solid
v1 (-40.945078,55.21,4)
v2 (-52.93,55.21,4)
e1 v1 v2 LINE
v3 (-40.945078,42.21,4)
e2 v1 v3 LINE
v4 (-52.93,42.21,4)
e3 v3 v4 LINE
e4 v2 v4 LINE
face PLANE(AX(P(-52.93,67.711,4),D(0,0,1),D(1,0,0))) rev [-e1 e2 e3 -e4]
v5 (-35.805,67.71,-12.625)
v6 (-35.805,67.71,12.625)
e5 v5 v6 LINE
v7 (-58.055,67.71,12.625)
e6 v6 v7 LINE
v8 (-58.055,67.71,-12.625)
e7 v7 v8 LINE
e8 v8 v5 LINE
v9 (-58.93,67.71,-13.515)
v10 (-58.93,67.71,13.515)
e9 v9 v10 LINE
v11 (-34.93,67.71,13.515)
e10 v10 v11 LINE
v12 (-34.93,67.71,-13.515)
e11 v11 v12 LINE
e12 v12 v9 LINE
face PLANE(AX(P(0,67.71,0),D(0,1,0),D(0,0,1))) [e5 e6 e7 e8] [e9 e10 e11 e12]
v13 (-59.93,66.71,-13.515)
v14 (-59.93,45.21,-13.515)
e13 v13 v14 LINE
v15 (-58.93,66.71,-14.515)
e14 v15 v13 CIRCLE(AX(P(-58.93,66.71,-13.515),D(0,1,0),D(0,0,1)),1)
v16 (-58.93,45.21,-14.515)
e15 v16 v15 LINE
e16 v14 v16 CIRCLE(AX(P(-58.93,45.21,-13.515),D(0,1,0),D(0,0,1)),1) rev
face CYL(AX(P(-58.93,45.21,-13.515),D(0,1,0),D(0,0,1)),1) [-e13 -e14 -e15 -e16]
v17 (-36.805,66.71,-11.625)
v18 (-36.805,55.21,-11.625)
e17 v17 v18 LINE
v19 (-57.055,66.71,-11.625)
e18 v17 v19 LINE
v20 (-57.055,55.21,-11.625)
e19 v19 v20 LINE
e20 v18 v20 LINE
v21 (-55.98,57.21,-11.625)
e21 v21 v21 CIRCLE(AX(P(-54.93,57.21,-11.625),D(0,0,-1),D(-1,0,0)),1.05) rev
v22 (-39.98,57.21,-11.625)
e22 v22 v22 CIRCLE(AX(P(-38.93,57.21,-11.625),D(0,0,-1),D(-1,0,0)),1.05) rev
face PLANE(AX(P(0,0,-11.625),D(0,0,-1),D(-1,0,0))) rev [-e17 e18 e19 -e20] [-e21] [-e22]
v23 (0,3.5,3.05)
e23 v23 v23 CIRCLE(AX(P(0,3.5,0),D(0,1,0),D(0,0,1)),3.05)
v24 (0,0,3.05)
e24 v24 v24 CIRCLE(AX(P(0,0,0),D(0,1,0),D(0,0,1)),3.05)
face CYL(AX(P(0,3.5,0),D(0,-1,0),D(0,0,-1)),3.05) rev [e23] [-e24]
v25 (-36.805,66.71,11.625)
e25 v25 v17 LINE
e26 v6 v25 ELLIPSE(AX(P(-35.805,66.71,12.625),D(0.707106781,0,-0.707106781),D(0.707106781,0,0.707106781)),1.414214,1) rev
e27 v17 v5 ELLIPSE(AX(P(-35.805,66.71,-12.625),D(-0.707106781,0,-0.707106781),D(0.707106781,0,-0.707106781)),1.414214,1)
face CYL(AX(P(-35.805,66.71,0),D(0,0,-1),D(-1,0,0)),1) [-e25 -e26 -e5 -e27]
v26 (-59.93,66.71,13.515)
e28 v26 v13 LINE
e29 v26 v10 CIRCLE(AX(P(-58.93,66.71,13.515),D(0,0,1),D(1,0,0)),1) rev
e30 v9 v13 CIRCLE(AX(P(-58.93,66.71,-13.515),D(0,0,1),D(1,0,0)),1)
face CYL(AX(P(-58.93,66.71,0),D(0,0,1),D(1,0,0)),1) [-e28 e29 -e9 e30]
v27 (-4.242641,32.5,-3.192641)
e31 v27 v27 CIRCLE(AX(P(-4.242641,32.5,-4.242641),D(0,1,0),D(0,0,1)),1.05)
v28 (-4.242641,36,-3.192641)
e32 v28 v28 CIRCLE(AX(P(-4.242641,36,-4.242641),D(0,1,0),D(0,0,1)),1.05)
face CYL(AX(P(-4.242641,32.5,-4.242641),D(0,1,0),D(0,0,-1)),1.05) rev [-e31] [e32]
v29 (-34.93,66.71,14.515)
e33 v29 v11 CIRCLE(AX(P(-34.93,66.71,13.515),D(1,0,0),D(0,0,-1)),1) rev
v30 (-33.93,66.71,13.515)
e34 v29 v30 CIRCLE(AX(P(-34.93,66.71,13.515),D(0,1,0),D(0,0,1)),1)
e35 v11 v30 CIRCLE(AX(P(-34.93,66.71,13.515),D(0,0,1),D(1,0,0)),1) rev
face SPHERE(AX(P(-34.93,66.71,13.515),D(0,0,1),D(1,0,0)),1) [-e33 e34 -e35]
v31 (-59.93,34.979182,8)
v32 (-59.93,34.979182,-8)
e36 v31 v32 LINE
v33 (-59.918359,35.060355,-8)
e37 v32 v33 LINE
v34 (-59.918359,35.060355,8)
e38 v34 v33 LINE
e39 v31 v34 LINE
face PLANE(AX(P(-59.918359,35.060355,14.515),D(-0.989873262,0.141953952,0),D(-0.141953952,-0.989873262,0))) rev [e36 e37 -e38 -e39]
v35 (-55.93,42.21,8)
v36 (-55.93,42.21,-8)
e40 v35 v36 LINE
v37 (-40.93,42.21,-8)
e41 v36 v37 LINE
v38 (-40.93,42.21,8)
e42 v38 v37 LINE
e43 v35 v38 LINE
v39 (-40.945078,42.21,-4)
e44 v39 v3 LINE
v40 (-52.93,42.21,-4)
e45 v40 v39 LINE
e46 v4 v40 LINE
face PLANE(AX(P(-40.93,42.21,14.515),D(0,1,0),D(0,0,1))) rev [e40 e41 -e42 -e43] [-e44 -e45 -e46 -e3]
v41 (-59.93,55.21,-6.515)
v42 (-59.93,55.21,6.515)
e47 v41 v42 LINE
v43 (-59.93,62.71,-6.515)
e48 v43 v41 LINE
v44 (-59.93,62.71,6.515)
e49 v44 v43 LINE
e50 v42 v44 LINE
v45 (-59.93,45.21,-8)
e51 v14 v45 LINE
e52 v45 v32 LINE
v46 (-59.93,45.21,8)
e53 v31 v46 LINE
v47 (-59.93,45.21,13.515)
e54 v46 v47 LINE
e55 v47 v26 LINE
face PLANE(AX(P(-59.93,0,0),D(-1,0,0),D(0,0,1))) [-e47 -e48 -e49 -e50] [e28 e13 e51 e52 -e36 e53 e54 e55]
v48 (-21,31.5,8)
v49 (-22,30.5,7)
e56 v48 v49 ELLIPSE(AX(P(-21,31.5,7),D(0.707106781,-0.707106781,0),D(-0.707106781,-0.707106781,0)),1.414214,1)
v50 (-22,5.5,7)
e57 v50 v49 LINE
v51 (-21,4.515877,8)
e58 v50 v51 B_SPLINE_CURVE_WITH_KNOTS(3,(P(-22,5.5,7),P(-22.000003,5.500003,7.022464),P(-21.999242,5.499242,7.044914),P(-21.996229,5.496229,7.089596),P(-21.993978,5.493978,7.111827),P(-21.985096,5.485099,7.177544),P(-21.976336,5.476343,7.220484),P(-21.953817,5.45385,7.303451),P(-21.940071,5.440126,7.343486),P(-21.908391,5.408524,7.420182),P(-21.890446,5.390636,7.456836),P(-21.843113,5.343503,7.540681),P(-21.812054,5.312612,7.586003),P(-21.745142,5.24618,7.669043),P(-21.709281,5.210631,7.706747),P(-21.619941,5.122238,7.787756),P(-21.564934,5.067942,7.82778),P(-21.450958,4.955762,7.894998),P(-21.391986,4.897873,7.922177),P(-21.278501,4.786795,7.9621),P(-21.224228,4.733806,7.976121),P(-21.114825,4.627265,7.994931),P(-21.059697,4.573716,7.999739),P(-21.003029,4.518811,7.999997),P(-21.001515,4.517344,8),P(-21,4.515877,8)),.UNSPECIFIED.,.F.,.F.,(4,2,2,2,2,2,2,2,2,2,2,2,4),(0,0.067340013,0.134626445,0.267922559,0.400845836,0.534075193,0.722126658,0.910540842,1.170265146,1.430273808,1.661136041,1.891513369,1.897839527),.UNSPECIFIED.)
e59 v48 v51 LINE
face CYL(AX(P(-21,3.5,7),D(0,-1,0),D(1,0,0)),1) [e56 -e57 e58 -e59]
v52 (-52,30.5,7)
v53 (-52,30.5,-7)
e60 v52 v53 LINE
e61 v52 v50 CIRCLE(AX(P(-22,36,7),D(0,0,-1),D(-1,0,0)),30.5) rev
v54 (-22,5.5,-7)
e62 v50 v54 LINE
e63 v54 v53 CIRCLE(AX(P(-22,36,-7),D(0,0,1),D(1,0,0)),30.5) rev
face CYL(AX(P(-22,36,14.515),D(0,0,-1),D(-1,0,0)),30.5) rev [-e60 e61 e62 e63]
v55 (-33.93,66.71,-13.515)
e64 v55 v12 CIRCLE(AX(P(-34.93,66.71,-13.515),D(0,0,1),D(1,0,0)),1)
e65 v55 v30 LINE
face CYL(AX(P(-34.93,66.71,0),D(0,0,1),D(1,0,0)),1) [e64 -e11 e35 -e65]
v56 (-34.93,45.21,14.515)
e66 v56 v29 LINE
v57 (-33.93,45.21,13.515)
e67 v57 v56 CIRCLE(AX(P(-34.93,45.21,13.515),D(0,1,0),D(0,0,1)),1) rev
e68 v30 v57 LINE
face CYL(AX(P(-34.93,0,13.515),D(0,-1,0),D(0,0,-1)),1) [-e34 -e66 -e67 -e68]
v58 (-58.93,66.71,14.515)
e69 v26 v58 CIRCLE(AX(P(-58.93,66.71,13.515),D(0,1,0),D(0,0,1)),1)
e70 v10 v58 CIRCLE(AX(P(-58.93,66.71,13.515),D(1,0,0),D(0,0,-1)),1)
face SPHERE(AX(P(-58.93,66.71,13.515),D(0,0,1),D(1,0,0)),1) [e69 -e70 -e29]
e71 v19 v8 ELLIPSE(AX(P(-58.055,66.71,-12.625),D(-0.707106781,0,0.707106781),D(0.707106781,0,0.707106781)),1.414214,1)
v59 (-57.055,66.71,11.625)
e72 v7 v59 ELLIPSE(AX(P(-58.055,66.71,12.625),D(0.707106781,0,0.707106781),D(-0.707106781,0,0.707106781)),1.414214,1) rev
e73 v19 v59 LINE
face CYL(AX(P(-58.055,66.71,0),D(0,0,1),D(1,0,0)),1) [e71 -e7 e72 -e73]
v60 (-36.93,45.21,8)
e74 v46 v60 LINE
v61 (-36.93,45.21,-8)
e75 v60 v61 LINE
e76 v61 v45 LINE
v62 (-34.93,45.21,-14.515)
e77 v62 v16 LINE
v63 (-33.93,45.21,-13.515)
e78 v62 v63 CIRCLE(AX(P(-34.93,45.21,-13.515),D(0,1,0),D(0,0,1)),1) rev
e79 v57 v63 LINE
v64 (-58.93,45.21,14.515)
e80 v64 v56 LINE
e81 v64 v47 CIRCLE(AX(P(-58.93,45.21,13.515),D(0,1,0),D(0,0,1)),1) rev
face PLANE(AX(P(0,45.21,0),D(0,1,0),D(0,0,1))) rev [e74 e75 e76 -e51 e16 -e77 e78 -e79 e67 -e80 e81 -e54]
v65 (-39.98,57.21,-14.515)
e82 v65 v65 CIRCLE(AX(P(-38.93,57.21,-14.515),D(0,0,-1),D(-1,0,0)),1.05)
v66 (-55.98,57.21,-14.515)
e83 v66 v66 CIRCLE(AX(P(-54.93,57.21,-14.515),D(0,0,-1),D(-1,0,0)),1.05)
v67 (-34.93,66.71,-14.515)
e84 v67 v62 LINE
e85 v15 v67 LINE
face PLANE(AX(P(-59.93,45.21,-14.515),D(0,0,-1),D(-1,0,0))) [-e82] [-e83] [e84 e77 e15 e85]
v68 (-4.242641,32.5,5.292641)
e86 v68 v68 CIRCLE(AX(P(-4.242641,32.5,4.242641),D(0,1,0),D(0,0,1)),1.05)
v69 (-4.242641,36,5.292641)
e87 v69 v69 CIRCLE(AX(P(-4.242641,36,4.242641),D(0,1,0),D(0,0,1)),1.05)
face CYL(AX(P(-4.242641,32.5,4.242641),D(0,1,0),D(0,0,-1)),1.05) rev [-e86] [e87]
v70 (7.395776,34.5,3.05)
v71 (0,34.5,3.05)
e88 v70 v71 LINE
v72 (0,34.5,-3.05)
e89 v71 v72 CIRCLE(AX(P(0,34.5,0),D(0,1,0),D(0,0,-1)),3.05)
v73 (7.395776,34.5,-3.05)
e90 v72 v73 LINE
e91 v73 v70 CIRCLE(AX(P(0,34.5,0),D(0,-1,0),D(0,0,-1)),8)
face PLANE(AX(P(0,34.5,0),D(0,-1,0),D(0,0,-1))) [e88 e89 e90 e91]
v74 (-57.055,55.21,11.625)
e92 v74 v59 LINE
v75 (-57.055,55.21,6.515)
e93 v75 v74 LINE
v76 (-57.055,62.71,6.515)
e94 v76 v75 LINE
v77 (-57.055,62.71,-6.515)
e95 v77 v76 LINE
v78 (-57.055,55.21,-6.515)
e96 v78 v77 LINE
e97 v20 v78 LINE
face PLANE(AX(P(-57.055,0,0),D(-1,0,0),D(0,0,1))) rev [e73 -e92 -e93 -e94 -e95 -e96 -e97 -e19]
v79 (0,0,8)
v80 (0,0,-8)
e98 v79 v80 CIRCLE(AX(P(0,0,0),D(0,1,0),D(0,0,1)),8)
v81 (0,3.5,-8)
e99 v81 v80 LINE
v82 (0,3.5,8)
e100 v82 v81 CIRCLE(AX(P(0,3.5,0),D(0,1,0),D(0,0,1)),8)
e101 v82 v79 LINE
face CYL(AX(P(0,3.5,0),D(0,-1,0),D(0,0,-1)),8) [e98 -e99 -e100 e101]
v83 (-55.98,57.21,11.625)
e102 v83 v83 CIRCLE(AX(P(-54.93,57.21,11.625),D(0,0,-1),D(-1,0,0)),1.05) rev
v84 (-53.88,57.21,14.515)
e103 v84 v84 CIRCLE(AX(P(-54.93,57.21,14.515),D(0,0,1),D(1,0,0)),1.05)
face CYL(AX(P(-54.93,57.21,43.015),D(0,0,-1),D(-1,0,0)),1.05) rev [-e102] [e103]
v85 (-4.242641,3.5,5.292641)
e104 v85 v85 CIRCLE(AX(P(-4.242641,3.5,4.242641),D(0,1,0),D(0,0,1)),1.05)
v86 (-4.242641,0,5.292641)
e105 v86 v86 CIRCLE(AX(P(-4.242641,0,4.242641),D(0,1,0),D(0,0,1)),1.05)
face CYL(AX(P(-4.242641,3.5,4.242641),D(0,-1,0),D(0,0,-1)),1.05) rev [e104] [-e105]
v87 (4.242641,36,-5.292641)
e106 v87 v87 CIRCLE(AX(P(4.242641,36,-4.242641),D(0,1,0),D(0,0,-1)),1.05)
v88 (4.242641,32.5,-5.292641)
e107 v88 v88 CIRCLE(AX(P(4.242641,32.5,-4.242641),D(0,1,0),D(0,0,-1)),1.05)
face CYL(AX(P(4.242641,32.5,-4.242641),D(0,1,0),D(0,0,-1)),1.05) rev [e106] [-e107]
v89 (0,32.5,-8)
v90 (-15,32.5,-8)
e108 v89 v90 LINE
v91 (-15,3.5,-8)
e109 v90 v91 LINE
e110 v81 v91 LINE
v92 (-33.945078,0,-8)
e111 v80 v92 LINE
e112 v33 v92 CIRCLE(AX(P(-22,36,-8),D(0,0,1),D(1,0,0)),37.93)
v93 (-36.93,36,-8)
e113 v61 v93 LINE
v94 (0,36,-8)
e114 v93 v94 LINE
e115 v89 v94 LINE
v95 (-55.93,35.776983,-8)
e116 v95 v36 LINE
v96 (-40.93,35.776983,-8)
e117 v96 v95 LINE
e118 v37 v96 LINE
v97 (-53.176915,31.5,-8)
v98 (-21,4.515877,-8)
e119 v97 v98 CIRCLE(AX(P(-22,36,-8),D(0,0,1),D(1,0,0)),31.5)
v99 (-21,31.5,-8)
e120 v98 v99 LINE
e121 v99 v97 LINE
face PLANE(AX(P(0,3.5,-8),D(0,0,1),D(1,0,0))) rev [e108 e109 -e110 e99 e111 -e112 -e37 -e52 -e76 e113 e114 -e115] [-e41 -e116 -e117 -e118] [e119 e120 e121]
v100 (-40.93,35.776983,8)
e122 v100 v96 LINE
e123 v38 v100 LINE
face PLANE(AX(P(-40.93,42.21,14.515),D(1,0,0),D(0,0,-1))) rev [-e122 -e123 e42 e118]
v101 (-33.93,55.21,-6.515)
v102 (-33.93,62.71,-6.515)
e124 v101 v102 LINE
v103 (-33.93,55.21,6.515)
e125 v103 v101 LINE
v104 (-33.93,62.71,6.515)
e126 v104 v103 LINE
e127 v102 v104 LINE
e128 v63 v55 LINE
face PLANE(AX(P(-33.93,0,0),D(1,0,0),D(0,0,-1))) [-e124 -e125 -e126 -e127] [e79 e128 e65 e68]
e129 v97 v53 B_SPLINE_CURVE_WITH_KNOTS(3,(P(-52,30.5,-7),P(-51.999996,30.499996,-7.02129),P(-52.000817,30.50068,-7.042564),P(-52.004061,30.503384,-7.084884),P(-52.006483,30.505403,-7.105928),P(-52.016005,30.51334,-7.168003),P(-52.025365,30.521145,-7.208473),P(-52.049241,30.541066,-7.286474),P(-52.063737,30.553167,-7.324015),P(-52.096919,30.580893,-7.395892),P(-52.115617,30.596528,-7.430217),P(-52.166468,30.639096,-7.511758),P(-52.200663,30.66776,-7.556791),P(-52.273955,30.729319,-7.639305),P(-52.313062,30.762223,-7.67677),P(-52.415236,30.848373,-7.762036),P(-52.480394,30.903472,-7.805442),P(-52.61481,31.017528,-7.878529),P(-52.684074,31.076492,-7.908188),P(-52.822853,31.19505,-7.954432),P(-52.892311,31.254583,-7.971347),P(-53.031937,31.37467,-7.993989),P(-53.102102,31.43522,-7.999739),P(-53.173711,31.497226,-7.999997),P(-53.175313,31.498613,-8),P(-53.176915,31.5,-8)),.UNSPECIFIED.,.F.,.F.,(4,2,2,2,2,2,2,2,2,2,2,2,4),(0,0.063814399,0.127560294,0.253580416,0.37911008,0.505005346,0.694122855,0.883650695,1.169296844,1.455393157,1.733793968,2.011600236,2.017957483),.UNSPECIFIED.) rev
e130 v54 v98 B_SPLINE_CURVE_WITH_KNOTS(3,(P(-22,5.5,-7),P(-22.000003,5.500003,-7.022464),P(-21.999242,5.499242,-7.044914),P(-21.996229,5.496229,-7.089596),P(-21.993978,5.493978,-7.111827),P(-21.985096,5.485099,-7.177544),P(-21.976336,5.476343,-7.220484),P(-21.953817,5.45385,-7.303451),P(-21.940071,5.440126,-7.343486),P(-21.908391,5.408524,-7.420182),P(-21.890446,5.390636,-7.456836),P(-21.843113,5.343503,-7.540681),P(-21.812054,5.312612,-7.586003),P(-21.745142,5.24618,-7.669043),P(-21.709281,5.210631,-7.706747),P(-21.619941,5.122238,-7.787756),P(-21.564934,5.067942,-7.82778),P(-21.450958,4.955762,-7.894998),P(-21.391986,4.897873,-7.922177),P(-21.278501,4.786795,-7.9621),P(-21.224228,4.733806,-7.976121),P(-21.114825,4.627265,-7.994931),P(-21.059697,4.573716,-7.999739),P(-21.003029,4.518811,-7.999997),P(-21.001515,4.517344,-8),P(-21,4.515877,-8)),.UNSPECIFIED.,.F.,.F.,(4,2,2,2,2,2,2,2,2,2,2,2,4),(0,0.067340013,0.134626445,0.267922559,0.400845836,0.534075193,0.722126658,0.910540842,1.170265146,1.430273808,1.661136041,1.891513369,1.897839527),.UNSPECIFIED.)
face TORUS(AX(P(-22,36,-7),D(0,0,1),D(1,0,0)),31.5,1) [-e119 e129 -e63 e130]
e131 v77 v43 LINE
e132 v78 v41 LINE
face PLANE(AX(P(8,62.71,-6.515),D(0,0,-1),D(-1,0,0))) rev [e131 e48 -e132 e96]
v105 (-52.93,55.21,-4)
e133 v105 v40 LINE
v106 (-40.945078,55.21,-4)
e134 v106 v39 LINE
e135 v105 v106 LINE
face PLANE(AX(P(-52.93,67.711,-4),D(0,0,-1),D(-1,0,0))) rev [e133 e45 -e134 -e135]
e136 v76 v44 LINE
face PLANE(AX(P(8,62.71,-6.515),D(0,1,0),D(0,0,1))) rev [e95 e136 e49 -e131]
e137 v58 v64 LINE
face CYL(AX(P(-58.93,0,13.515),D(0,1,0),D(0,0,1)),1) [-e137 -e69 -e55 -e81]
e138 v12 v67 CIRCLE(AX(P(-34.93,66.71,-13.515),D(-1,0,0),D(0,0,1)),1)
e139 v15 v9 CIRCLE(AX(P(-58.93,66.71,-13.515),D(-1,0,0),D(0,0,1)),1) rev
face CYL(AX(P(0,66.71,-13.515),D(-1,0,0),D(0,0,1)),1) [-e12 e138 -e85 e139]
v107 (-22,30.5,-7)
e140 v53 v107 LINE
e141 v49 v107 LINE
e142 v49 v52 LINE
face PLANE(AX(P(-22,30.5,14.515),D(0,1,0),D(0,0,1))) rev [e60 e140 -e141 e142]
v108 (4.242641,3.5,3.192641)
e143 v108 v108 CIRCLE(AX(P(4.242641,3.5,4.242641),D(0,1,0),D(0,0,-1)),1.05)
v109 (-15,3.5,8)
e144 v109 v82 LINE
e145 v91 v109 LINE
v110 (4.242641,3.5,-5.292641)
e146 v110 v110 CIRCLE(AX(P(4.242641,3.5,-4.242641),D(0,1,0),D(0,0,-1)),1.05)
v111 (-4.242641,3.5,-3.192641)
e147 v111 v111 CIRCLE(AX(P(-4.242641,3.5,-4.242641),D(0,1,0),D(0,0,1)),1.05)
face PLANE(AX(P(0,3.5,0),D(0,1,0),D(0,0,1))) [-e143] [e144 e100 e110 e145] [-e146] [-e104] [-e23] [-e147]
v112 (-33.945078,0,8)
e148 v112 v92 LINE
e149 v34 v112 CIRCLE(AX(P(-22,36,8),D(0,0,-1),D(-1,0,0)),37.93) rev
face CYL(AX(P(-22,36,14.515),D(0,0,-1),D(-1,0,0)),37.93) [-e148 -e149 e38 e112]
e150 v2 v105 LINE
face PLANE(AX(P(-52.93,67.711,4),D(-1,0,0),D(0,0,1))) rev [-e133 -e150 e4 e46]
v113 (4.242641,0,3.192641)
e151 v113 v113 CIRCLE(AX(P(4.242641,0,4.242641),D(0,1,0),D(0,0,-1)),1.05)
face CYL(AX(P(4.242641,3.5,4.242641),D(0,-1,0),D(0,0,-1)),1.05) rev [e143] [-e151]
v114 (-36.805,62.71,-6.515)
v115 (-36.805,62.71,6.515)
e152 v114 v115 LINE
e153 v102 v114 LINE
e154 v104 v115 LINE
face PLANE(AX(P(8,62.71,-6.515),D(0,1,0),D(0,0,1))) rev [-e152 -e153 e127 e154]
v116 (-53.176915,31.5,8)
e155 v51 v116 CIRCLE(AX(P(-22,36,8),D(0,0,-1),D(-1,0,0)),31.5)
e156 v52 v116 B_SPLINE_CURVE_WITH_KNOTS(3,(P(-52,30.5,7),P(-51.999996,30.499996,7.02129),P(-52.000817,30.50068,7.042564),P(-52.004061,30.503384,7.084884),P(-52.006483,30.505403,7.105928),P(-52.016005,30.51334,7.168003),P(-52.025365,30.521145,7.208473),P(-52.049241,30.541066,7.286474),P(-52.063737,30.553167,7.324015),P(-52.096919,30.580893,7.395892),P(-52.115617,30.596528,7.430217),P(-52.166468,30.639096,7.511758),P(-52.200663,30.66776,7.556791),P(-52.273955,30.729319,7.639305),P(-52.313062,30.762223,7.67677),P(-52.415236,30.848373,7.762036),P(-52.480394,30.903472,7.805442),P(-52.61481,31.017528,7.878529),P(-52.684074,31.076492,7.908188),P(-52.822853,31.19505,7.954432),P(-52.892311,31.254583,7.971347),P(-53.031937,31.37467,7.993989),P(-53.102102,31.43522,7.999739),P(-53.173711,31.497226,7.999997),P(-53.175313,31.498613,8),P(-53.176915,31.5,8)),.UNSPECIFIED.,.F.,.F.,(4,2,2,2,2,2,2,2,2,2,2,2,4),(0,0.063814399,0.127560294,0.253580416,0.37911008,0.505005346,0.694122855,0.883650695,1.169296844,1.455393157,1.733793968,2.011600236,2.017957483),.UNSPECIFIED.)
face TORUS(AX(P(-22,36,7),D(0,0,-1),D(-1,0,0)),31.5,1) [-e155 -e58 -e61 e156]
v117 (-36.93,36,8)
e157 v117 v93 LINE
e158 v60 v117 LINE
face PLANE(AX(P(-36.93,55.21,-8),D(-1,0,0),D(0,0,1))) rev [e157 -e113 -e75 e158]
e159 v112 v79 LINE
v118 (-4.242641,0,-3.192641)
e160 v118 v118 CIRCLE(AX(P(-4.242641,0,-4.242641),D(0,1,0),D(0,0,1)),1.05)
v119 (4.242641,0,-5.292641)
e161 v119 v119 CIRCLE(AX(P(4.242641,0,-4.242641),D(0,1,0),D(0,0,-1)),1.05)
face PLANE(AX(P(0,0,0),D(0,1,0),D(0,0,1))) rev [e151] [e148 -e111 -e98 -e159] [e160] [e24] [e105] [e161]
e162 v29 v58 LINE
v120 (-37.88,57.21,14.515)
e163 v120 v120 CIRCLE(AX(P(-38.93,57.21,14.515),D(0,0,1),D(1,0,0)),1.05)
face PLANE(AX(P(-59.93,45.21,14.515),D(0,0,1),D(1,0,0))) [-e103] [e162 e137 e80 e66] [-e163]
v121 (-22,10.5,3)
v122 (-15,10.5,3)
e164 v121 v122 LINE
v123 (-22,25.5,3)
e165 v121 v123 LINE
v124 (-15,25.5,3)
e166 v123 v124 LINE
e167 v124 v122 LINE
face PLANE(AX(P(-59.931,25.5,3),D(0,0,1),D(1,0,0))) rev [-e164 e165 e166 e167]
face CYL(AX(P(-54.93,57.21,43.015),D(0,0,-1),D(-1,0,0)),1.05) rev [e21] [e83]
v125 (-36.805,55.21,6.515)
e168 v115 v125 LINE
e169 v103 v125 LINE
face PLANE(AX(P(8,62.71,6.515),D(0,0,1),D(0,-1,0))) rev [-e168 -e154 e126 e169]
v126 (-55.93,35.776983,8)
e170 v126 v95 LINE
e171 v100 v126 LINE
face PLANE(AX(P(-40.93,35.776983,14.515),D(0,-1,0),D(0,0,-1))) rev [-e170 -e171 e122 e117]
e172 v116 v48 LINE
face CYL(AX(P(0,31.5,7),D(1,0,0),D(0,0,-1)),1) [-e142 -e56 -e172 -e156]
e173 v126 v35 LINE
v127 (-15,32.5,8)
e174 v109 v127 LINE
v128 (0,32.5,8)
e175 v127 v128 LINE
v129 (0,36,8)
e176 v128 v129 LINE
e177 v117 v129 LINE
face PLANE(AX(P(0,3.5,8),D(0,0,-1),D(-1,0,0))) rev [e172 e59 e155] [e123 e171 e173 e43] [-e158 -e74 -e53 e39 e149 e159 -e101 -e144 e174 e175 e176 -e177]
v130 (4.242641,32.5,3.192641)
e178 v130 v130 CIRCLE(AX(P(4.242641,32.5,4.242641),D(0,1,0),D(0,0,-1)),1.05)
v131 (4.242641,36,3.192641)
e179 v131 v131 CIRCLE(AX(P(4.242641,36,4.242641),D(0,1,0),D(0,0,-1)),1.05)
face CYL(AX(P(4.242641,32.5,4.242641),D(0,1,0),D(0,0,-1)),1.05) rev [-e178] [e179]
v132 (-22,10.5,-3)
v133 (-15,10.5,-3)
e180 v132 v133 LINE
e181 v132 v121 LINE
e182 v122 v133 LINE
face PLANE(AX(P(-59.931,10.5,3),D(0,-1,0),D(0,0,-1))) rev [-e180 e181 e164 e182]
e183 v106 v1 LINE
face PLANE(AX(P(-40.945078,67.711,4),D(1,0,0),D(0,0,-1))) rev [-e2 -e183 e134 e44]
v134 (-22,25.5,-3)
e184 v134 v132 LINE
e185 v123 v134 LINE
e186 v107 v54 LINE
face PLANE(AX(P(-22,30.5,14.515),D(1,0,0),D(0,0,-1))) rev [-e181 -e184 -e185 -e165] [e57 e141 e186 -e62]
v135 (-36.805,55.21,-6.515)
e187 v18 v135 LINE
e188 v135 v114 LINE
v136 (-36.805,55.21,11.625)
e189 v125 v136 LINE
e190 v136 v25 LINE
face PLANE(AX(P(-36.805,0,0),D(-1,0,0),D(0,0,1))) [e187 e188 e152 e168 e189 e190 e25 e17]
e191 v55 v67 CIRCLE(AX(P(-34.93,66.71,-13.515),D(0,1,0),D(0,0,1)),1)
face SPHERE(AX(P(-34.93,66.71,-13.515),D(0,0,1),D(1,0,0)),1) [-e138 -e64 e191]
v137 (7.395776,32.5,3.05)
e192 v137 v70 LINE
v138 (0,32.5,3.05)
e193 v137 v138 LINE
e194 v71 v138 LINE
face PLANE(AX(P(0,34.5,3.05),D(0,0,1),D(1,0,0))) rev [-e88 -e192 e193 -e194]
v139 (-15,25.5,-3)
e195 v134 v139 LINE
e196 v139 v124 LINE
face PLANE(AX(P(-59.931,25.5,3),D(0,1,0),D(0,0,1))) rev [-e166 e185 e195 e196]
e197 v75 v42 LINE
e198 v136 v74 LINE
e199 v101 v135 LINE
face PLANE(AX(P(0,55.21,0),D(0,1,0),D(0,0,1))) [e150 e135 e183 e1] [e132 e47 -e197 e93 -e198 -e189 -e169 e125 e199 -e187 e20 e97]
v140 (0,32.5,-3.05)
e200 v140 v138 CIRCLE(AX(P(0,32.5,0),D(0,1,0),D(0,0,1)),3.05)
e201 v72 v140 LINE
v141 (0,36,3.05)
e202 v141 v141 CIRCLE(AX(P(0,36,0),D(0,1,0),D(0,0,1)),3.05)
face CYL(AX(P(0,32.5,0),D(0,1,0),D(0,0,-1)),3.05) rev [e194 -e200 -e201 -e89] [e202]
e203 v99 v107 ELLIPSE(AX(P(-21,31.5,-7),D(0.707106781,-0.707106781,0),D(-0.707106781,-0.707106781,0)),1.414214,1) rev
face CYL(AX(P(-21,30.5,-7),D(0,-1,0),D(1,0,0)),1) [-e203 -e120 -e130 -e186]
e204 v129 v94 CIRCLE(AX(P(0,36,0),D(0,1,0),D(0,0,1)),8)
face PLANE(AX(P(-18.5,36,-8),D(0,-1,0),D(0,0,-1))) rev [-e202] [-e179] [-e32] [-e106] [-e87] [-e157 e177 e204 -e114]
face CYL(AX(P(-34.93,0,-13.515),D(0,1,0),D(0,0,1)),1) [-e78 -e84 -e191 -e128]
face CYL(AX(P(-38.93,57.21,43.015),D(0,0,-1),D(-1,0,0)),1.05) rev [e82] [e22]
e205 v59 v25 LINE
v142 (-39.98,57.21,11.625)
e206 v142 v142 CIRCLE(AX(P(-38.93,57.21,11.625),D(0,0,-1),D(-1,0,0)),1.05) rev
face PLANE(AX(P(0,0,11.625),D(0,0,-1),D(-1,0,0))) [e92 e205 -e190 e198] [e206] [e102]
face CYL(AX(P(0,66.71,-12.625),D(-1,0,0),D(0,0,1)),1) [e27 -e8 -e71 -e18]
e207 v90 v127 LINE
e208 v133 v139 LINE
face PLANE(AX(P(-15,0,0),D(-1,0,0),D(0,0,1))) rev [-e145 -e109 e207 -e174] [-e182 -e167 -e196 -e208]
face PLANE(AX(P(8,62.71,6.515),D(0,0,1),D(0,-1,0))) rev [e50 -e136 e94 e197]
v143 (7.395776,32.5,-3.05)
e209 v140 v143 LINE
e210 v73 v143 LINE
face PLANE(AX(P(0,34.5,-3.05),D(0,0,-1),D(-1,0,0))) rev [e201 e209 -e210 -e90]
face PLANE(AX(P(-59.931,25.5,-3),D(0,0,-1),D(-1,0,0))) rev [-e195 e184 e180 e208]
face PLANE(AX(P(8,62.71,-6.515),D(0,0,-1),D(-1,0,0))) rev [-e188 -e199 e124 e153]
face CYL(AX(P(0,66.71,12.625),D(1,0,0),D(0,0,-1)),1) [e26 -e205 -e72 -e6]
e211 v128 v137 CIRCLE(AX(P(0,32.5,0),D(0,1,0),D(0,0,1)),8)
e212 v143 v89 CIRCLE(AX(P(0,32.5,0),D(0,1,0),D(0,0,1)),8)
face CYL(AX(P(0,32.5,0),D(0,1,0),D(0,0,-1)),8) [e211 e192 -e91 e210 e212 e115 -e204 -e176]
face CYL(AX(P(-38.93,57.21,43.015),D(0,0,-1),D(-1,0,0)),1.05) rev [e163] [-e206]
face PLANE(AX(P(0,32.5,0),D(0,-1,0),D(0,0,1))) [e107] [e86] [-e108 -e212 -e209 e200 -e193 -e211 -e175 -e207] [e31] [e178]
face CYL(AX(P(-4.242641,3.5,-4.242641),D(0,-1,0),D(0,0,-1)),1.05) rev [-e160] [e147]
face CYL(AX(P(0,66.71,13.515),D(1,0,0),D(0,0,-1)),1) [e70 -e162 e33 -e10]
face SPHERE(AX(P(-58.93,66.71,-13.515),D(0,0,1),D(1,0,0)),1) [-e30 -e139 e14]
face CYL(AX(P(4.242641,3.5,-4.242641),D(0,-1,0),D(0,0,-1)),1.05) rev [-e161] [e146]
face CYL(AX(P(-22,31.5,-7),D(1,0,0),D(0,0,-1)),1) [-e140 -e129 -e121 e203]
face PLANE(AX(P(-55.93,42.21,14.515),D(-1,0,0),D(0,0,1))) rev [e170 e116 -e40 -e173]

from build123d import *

# Parameters (mm, degrees)
SKETCH_1_R           = 3.05
SKETCH_1_R_2         = 1.05
EXTRUDE_1_DEPTH      = 3.5
SKETCH_2_W           = 16
SKETCH_2_H           = 36
EXTRUDE_2_DEPTH      = 3.5
SKETCH_4_W           = 16
SKETCH_4_H           = 36
EXTRUDE_3_DEPTH      = 41.43
CUT_EXTRUDE_1_DEPTH  = 2
SKETCH_6_W           = 23
SKETCH_6_H           = 16
EXTRUDE_4_DEPTH      = 19.21
EXTRUDE_7_DEPTH      = 12.5
EXTRUDE_7_DEPTH_BACK = 10
SKETCH_9_W           = 3.515
SKETCH_9_H           = 10
EXTRUDE_8_DEPTH      = 20
EXTRUDE_9_DEPTH      = 3
SKETCH_11_R          = 1.05
CUT_EXTRUDE_2_DEPTH  = 31.5
SKETCH_12_W          = 15
SKETCH_12_H          = 6.433017237
CUT_EXTRUDE_3_DEPTH  = 94.183551258
CUT_EXTRUDE_4_REACH  = 76.726
SKETCH_13_W          = 11.984921516
SKETCH_13_H          = 8
SKETCH_14_W          = 13.03
SKETCH_14_H          = 7.5
CUT_EXTRUDE_5_DEPTH  = 98.004196945
CUT_EXTRUDE_6_REACH  = 84.547
SKETCH_15_W          = 6
SKETCH_15_H          = 15
SKETCH_17_W          = 20
SKETCH_17_H          = 12.5
CUT_EXTRUDE_11_DEPTH = 11.625
CUT_EXTRUDE_12_DEPTH = 10.125
FILLET_2_R           = 1
FILLET_3_R           = 1
FILLET_5_R           = 1
FILLET_7_R           = 1


with BuildPart() as part:
    # 草图1 → 凸台-拉伸1 (new body)
    with BuildSketch(Plane(origin=(0, 0, 0), x_dir=(1, 0, 0), z_dir=(0, 1, 0))):
        with BuildLine():
            Line((0, 8), (-15, 8))
            Line((-15, 8), (-15, -8))
            Line((-15, -8), (0, -8))
            ThreePointArc((0, -8), (8, 0), (0, 8))
        make_face()
        with Locations(Location((0, 0, 0), (0, 0, 270))):
            Circle(SKETCH_1_R, mode=Mode.SUBTRACT)
        with Locations(Location((-4.242640687, 4.242640687, 0), (0, 0, 270))):
            Circle(SKETCH_1_R_2, mode=Mode.SUBTRACT)
        with Locations(Location((-4.242640687, -4.242640687, 0), (0, 0, 270))):
            Circle(SKETCH_1_R_2, mode=Mode.SUBTRACT)
        with Locations(Location((4.242640687, -4.242640687, 0), (0, 0, 90))):
            Circle(SKETCH_1_R_2, mode=Mode.SUBTRACT)
        with Locations(Location((4.242640687, 4.242640687, 0), (0, 0, 90))):
            Circle(SKETCH_1_R_2, mode=Mode.SUBTRACT)
    extrude(amount=EXTRUDE_1_DEPTH)


with BuildPart() as body_2:
    # 镜向4: mirrored copy
    add(part.part.mirror(Plane.ZX.offset(18)))


with BuildPart() as part_1:
    add(part.part)

    add(body_2.part)  # 凸台-拉伸2 merges body 2
    # 草图2 → 凸台-拉伸2 (add)
    with BuildSketch(Plane.ZY.offset(15)):
        with Locations((0, 18)):
            Rectangle(SKETCH_2_W, SKETCH_2_H)
    extrude(amount=EXTRUDE_2_DEPTH)

    # 草图4 → 凸台-拉伸3 (add)
    with BuildSketch(Plane.ZY.offset(18.5)):
        with Locations((0, 18)):
            Rectangle(SKETCH_4_W, SKETCH_4_H)
    extrude(amount=EXTRUDE_3_DEPTH)

    # 草图5 → 切除-拉伸1 (cut)
    with BuildSketch(Plane.XZ.offset(-32.5)):
        with BuildLine():
            Line((0, 3.05), (8.87097286, 3.05))
            Line((8.87097286, 3.05), (10.441846702, -3.05))
            Line((10.441846702, -3.05), (0, -3.05))
            ThreePointArc((0, -3.05), (3.05, 0), (0, 3.05))
        make_face()
    extrude(amount=-CUT_EXTRUDE_1_DEPTH, mode=Mode.SUBTRACT)

    # 草图6 → 凸台-拉伸4 (add)
    with BuildSketch(Plane(origin=(0, 36, 0), x_dir=(1, 0, 0), z_dir=(0, 1, 0))):
        with Locations((-48.43, 0)):
            Rectangle(SKETCH_6_W, SKETCH_6_H)
    extrude(amount=EXTRUDE_4_DEPTH)

    # 草图8 → 凸台-拉伸7 (add, two sides: drawn at the far end of the back side and taken through both)
    with BuildSketch(Plane(origin=(0, 55.21, 0), x_dir=(1, 0, 0), z_dir=(0, 1, 0)).offset(-EXTRUDE_7_DEPTH_BACK)):
        Polygon((-56.93, 11.515), (-36.93, 11.515), (-36.93, 14.515), (-59.93, 14.515), (-59.93, 11.515), (-59.93, 0), (-59.93, -11.515), (-59.93, -14.515), (-36.93, -14.515), (-36.93, -11.515), (-56.93, -11.515), (-56.93, -8), (-56.93, 8), align=None)
    extrude(amount=EXTRUDE_7_DEPTH + EXTRUDE_7_DEPTH_BACK)

    # 草图9 → 凸台-拉伸8 (add)
    with BuildSketch(Plane(origin=(-56.93, 0, 0), x_dir=(0, 0, -1), z_dir=(1, 0, 0))):
        with Locations((-9.7575, 50.21)):
            Rectangle(SKETCH_9_W, SKETCH_9_H)
        with Locations((9.7575, 50.21)):
            Rectangle(SKETCH_9_W, SKETCH_9_H)
    extrude(amount=EXTRUDE_8_DEPTH)

    # 草图10 → 凸台-拉伸9 (add)
    with BuildSketch(Plane(origin=(-36.93, 0, 0), x_dir=(0, 0, -1), z_dir=(1, 0, 0))):
        Polygon((-11.515, 67.71), (11.515, 67.71), (14.515, 67.71), (14.515, 45.21), (8, 45.21), (-8, 45.21), (-14.515, 45.21), (-14.515, 67.71), align=None)
    extrude(amount=EXTRUDE_9_DEPTH)

    # 草图11 → 切除-拉伸2 (cut, symmetric)
    with BuildSketch(Plane(origin=(0, 0, 11.515), x_dir=(-1, 0, 0), z_dir=(0, 0, -1))):
        with Locations((38.93, 57.21)):
            Circle(SKETCH_11_R)
        with Locations((54.93, 57.21)):
            Circle(SKETCH_11_R)
    extrude(amount=CUT_EXTRUDE_2_DEPTH, both=True, mode=Mode.SUBTRACT)

    # 草图12 → 切除-拉伸3 (cut, through all)
    with BuildSketch(Plane(origin=(0, 0, -8), x_dir=(-1, 0, 0), z_dir=(0, 0, -1))):
        with BuildLine():
            Line((22, 30.5), (22, 5.5))
            ThreePointArc((22, 5.5), (41.52562419, 12.569250972), (52, 30.5))
            Line((52, 30.5), (22, 30.5))
        make_face()
        with Locations((48.43, 38.993491382)):
            Rectangle(SKETCH_12_W, SKETCH_12_H)
        with BuildLine():
            Line((59.918359247, 35.060355361), (67.982296312, -21.171088437))
            Line((67.982296312, -21.171088437), (30.309681235, -1.008567897))
            ThreePointArc((30.309681235, -1.008567897), (51.317225959, 11.93373394), (59.918359247, 35.060355361))
        make_face()
    extrude(amount=-CUT_EXTRUDE_3_DEPTH, mode=Mode.SUBTRACT)

    # 草图13 → 切除-拉伸4 (cut, up to next)
    with BuildSketch(Plane.XZ.offset(-42.21), mode=Mode.PRIVATE) as cut_extrude_4_sk1:
        with Locations((-46.937539242, 0)):
            Rectangle(SKETCH_13_W, SKETCH_13_H)
    cut_extrude_4_tool1 = extrude(cut_extrude_4_sk1.sketch, amount=-CUT_EXTRUDE_4_REACH, mode=Mode.PRIVATE) & part_1.part
    add(cut_extrude_4_tool1.solids().sort_by_distance((-46.937539, 42.21, 0))[0], mode=Mode.SUBTRACT)

    # 草图14 → 切除-拉伸5 (cut, through all)
    with BuildSketch(Plane.ZY.offset(59.93)):
        with Locations((0, 58.96)):
            Rectangle(SKETCH_14_W, SKETCH_14_H)
    extrude(amount=-CUT_EXTRUDE_5_DEPTH, mode=Mode.SUBTRACT)

    # 草图15 → 切除-拉伸6 (cut, up to next)
    with BuildSketch(Plane(origin=(-15, 0, 0), x_dir=(0, 0, -1), z_dir=(1, 0, 0)), mode=Mode.PRIVATE) as cut_extrude_6_sk1:
        with Locations((0, 18)):
            Rectangle(SKETCH_15_W, SKETCH_15_H)
    cut_extrude_6_tool1 = extrude(cut_extrude_6_sk1.sketch, amount=-CUT_EXTRUDE_6_REACH, mode=Mode.PRIVATE) & part_1.part
    add(cut_extrude_6_tool1.solids().sort_by_distance((-15, 18, 0))[0], mode=Mode.SUBTRACT)

    # 草图17 → 切除-拉伸11 (cut, symmetric)
    with BuildSketch(Plane(origin=(0, 0, 0), x_dir=(-1, 0, 0), z_dir=(0, 0, -1))):
        with Locations((46.93, 61.46)):
            Rectangle(SKETCH_17_W, SKETCH_17_H)
    extrude(amount=CUT_EXTRUDE_11_DEPTH, both=True, mode=Mode.SUBTRACT)

    # 草图18 → 切除-拉伸12 (cut, symmetric)
    with BuildSketch(Plane.ZY.offset(46.93)):
        Polygon((-11.625, 55.21), (-6.515, 55.21), (-6.515, 62.71), (6.515, 62.71), (6.515, 55.21), (11.625, 55.21), (11.625, 67.71), (-11.625, 67.71), align=None)
    extrude(amount=CUT_EXTRUDE_12_DEPTH, both=True, mode=Mode.SUBTRACT)

    # 圆角2
    fillet_2_edges = [part_1.edges().sort_by_distance(p)[0] for p in [
        (-46.93, 67.71, -11.625),
        (-46.93, 67.71, 11.625),
        (-36.805, 67.71, 0),
        (-57.055, 67.71, 0),
    ]]
    fillet(fillet_2_edges, radius=FILLET_2_R)

    # 圆角3
    fillet_3_edges = [part_1.edges().sort_by_distance(p)[0] for p in [
        (-46.93, 67.71, -14.515),
        (-59.93, 67.71, 0),
        (-46.93, 67.71, 14.515),
        (-33.93, 67.71, 0),
    ]]
    fillet(fillet_3_edges, radius=FILLET_3_R)

    # 圆角5
    # the kernel refuses this fillet: 1 mm, written as the material it takes off along each edge
    with BuildSketch(Plane(origin=(-58.93, 66.71, -13.515), x_dir=(-1, 0, 0), z_dir=(0, 0, -1))) as fillet_5_piece_1_section:
        Polygon((0, 0), (FILLET_5_R, 0), (FILLET_5_R, FILLET_5_R), (0, FILLET_5_R), align=None)
    fillet_5_piece_1 = extrude(amount=FILLET_5_R, mode=Mode.PRIVATE)
    fillet_5_piece_1 = fillet_5_piece_1 - Plane(origin=(-58.93, 66.71, -13.515), x_dir=(0.7071067811865475, -0.7071067811865475, 0), z_dir=(0, 0, -1)) * Sphere(FILLET_5_R, mode=Mode.PRIVATE)
    add(fillet_5_piece_1, mode=Mode.SUBTRACT)
    with BuildSketch(Plane(origin=(-34.93, 66.71, -13.515), x_dir=(1, 0, 0), z_dir=(0, 0, -1))) as fillet_5_piece_2_section:
        Polygon((0, 0), (FILLET_5_R, 0), (FILLET_5_R, -FILLET_5_R), (0, -FILLET_5_R), align=None)
    fillet_5_piece_2 = extrude(amount=FILLET_5_R, mode=Mode.PRIVATE)
    fillet_5_piece_2 = fillet_5_piece_2 - Plane(origin=(-34.93, 66.71, -13.515), x_dir=(-0.7071067811865475, -0.7071067811865475, 0), z_dir=(0, 0, -1)) * Sphere(FILLET_5_R, mode=Mode.PRIVATE)
    add(fillet_5_piece_2, mode=Mode.SUBTRACT)
    with BuildSketch(Plane(origin=(-58.93, 66.71, 13.515), x_dir=(0, 0, 1), z_dir=(-1, 0, 0))) as fillet_5_piece_3_section:
        Polygon((0, 0), (FILLET_5_R, 0), (FILLET_5_R, FILLET_5_R), (0, FILLET_5_R), align=None)
    fillet_5_piece_3 = extrude(amount=FILLET_5_R, mode=Mode.PRIVATE)
    fillet_5_piece_3 = fillet_5_piece_3 - Plane(origin=(-58.93, 66.71, 13.515), x_dir=(0, -0.7071067811865475, -0.7071067811865475), z_dir=(-1, 0, 0)) * Sphere(FILLET_5_R, mode=Mode.PRIVATE)
    add(fillet_5_piece_3, mode=Mode.SUBTRACT)
    with BuildSketch(Plane(origin=(-34.93, 66.71, 13.515), x_dir=(0, 0, 1), z_dir=(1, 0, 0))) as fillet_5_piece_4_section:
        Polygon((0, 0), (FILLET_5_R, 0), (FILLET_5_R, -FILLET_5_R), (0, -FILLET_5_R), align=None)
    fillet_5_piece_4 = extrude(amount=FILLET_5_R, mode=Mode.PRIVATE)
    fillet_5_piece_4 = fillet_5_piece_4 - Plane(origin=(-34.93, 66.71, 13.515), x_dir=(0, -0.7071067811865475, -0.7071067811865475), z_dir=(1, 0, 0)) * Sphere(FILLET_5_R, mode=Mode.PRIVATE)
    add(fillet_5_piece_4, mode=Mode.SUBTRACT)
    with BuildSketch(Plane(origin=(-59.93, 42.71, 14.515), x_dir=(0, 0, -1), z_dir=(0, 1, 0)), Plane(origin=(-59.93, 42.71, -14.515), x_dir=(1, 0, 0), z_dir=(0, 1, 0)), Plane(origin=(-33.93, 66.71, -14.515), x_dir=(-1, 0, 0), z_dir=(0, -1, 0))) as fillet_5_piece_5:
        with BuildLine():
            CenterArc((FILLET_5_R, -FILLET_5_R), FILLET_5_R, 90, 90)
            Line((0, -FILLET_5_R), (0, 0))
            Line((0, 0), (FILLET_5_R, 0))
        make_face()
    extrude(amount=24, mode=Mode.SUBTRACT)
    with BuildSketch(Plane(origin=(-33.93, 42.71, 14.515), x_dir=(0, 0, -1), z_dir=(0, 1, 0))) as fillet_5_piece_6:
        with BuildLine():
            CenterArc((FILLET_5_R, FILLET_5_R), FILLET_5_R, 180, 90)
            Line((0, FILLET_5_R), (0, 0))
            Line((0, 0), (FILLET_5_R, 0))
        make_face()
    extrude(amount=24, mode=Mode.SUBTRACT)

    # 圆角7
    fillet_7_edges = [part_1.edges().sort_by_distance(p)[0] for p in [
        (-22, 18, 8),
        (-41.52562419, 12.569250972, 8),
        (-37, 30.5, 8),
        (-37, 30.5, -8),
        (-22, 18, -8),
        (-41.52562419, 12.569250972, -8),
    ]]
    fillet(fillet_7_edges, radius=FILLET_7_R)


solid = part_1.part
